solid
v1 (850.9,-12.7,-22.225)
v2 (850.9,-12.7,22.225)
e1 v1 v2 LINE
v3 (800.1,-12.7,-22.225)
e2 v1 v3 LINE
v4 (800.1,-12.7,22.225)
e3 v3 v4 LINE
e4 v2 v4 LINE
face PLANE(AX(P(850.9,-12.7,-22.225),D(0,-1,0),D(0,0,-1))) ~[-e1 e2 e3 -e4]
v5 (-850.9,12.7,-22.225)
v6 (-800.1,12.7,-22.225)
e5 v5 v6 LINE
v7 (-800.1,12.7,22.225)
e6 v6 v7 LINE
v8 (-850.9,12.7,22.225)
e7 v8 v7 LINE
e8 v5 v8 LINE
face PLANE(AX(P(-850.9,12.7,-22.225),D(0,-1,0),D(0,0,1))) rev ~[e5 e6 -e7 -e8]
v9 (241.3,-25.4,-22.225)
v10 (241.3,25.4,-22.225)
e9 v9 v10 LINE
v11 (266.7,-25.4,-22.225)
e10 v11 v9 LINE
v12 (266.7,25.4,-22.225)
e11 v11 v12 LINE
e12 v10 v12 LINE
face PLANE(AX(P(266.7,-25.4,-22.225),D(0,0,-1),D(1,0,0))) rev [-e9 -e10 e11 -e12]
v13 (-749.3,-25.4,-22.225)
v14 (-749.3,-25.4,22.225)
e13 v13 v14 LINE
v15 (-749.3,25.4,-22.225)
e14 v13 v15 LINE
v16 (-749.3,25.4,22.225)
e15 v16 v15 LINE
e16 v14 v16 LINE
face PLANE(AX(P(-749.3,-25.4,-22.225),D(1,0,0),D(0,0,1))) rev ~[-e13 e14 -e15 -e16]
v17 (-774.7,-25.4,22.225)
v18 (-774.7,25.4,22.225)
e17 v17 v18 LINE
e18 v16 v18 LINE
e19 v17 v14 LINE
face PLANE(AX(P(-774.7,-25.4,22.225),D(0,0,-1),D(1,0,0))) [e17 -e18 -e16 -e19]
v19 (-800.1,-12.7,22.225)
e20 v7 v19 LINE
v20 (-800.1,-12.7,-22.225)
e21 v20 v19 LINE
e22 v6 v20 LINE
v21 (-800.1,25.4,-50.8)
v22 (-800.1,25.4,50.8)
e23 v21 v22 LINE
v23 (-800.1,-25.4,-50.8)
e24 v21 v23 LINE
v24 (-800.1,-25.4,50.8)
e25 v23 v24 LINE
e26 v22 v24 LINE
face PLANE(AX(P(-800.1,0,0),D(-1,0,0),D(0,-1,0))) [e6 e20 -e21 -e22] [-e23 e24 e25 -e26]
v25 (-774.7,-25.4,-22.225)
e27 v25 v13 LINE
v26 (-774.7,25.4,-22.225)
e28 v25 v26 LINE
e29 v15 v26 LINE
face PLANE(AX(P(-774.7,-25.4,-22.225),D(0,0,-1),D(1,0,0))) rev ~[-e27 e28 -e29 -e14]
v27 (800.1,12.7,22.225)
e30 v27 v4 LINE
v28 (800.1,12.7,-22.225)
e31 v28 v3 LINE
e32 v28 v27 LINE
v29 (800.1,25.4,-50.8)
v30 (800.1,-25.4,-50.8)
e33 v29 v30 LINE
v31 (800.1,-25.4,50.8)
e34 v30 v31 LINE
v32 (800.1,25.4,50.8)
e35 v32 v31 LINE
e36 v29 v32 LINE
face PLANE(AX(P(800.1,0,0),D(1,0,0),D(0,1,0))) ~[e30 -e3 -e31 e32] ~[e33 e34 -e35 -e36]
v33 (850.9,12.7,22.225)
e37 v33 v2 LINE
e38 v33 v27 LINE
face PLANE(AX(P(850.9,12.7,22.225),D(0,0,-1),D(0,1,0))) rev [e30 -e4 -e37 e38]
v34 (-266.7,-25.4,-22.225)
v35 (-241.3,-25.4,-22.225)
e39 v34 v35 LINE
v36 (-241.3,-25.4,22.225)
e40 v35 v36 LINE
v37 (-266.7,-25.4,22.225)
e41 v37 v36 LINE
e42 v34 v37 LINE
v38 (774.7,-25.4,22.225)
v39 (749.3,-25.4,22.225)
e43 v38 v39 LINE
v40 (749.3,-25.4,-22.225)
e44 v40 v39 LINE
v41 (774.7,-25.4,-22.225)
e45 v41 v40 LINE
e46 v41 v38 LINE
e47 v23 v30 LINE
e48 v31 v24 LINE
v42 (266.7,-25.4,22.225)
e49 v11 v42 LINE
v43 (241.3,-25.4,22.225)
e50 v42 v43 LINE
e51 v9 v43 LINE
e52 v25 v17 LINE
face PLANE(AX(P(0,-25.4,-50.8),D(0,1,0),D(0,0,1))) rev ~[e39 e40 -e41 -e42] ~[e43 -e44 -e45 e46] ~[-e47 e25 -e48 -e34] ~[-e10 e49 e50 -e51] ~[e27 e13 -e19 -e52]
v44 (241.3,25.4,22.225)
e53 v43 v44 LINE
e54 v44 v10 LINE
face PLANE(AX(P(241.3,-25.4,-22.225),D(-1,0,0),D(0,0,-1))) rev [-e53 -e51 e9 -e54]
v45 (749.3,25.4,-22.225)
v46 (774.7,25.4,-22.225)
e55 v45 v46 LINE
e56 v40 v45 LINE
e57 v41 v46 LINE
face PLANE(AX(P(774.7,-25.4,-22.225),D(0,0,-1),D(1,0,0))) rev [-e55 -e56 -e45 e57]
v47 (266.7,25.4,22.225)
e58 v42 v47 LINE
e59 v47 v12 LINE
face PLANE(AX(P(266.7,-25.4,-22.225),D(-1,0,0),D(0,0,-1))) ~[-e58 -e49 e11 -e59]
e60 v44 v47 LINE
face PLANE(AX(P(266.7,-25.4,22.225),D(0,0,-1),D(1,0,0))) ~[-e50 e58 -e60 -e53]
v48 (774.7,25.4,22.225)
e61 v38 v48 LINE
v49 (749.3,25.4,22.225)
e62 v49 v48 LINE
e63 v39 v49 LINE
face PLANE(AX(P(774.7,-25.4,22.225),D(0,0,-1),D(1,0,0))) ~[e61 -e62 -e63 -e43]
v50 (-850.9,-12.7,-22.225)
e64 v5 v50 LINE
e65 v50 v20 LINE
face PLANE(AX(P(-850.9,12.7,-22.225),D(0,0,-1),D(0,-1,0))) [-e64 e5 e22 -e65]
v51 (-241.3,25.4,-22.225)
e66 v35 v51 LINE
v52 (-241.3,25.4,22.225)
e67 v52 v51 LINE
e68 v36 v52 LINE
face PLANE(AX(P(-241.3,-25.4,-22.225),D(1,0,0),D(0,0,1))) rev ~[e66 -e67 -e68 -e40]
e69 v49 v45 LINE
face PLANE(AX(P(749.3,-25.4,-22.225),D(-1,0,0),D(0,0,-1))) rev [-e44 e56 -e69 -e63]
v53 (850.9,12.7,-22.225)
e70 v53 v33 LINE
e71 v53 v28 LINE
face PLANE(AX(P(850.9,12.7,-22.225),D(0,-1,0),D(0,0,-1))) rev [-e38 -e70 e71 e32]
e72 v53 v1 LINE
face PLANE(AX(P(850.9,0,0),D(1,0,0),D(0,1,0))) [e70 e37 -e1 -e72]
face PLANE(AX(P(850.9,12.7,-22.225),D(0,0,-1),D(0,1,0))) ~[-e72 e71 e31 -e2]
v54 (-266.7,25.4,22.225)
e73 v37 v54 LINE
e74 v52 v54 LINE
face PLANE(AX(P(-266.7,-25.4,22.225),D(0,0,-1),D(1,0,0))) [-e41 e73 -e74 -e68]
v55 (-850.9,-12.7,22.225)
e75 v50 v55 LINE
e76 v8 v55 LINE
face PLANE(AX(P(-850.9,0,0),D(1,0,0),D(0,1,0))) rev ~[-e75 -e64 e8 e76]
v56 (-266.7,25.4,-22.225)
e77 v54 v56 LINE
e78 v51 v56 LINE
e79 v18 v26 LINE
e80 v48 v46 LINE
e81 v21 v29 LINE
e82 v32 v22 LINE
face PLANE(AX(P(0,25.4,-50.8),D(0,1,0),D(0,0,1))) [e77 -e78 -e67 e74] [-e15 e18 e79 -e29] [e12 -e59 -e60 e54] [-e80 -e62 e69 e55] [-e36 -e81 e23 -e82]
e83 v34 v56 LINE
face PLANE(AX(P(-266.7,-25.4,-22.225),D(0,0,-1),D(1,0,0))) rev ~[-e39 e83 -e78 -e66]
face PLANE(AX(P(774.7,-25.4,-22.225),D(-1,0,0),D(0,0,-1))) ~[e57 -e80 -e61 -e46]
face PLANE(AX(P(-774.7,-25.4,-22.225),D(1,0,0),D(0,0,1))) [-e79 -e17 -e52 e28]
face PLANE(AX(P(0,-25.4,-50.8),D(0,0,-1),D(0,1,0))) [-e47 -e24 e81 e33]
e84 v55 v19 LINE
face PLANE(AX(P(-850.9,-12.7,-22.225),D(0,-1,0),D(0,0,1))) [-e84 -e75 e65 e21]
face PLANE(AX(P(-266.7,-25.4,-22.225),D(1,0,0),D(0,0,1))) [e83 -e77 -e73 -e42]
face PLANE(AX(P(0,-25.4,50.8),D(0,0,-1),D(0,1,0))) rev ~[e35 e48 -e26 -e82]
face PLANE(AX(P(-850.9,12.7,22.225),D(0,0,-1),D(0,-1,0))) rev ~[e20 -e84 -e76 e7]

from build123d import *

# Parameters (mm, degrees)
F0_W     = 50.8
F0_H     = 101.6
F1_DEPTH = 850.9
F2_W     = 50.8
F2_H     = 101.6
F2_W_2   = 25.4
F2_H_2   = 44.45
F3_DEPTH = 50.8
F4_W     = 25.4
F4_H     = 44.45
F5_DEPTH = 50.801


# Not quite as in the source:
# - a pattern or mirror of a feature is missing from the dataset's text; its kind, count and spacing are read off the source's solid


with BuildPart() as f1:
    # F0 (on Right) → F1 (new body, symmetric)
    with BuildSketch(Plane.YZ):
        Rectangle(F0_W, F0_H)
    extrude(amount=F1_DEPTH, both=True)

    # F2 (on face) → F3 (cut)
    with BuildSketch(Plane(origin=(-850.9, 0, 0), x_dir=(0, -1, 0), z_dir=(-1, 0, 0))):
        Rectangle(F2_W, F2_H)
        Rectangle(F2_W_2, F2_H_2, mode=Mode.SUBTRACT)
    f3 = extrude(amount=-F3_DEPTH, mode=Mode.SUBTRACT)

    # F3_copies: F3 across plane
    add(f3.mirror(Plane(origin=(0, 0, 0), x_dir=(0, 0, 1), z_dir=(1, 0, 0))), mode=Mode.SUBTRACT)

    # F4 (on face) → F5 (cut, through all)
    with BuildSketch(Plane.XZ.offset(25.4)):
        with Locations((-762, 0)):
            Rectangle(F4_W, F4_H)
        with Locations((-254, 0)):
            Rectangle(F4_W, F4_H)
    f5 = extrude(amount=-F5_DEPTH, mode=Mode.SUBTRACT)

    # F5_copies: F5 across plane
    add(f5.mirror(Plane(origin=(0, 0, 0), x_dir=(0, 0, 1), z_dir=(1, 0, 0))), mode=Mode.SUBTRACT)


solid = f1.part
